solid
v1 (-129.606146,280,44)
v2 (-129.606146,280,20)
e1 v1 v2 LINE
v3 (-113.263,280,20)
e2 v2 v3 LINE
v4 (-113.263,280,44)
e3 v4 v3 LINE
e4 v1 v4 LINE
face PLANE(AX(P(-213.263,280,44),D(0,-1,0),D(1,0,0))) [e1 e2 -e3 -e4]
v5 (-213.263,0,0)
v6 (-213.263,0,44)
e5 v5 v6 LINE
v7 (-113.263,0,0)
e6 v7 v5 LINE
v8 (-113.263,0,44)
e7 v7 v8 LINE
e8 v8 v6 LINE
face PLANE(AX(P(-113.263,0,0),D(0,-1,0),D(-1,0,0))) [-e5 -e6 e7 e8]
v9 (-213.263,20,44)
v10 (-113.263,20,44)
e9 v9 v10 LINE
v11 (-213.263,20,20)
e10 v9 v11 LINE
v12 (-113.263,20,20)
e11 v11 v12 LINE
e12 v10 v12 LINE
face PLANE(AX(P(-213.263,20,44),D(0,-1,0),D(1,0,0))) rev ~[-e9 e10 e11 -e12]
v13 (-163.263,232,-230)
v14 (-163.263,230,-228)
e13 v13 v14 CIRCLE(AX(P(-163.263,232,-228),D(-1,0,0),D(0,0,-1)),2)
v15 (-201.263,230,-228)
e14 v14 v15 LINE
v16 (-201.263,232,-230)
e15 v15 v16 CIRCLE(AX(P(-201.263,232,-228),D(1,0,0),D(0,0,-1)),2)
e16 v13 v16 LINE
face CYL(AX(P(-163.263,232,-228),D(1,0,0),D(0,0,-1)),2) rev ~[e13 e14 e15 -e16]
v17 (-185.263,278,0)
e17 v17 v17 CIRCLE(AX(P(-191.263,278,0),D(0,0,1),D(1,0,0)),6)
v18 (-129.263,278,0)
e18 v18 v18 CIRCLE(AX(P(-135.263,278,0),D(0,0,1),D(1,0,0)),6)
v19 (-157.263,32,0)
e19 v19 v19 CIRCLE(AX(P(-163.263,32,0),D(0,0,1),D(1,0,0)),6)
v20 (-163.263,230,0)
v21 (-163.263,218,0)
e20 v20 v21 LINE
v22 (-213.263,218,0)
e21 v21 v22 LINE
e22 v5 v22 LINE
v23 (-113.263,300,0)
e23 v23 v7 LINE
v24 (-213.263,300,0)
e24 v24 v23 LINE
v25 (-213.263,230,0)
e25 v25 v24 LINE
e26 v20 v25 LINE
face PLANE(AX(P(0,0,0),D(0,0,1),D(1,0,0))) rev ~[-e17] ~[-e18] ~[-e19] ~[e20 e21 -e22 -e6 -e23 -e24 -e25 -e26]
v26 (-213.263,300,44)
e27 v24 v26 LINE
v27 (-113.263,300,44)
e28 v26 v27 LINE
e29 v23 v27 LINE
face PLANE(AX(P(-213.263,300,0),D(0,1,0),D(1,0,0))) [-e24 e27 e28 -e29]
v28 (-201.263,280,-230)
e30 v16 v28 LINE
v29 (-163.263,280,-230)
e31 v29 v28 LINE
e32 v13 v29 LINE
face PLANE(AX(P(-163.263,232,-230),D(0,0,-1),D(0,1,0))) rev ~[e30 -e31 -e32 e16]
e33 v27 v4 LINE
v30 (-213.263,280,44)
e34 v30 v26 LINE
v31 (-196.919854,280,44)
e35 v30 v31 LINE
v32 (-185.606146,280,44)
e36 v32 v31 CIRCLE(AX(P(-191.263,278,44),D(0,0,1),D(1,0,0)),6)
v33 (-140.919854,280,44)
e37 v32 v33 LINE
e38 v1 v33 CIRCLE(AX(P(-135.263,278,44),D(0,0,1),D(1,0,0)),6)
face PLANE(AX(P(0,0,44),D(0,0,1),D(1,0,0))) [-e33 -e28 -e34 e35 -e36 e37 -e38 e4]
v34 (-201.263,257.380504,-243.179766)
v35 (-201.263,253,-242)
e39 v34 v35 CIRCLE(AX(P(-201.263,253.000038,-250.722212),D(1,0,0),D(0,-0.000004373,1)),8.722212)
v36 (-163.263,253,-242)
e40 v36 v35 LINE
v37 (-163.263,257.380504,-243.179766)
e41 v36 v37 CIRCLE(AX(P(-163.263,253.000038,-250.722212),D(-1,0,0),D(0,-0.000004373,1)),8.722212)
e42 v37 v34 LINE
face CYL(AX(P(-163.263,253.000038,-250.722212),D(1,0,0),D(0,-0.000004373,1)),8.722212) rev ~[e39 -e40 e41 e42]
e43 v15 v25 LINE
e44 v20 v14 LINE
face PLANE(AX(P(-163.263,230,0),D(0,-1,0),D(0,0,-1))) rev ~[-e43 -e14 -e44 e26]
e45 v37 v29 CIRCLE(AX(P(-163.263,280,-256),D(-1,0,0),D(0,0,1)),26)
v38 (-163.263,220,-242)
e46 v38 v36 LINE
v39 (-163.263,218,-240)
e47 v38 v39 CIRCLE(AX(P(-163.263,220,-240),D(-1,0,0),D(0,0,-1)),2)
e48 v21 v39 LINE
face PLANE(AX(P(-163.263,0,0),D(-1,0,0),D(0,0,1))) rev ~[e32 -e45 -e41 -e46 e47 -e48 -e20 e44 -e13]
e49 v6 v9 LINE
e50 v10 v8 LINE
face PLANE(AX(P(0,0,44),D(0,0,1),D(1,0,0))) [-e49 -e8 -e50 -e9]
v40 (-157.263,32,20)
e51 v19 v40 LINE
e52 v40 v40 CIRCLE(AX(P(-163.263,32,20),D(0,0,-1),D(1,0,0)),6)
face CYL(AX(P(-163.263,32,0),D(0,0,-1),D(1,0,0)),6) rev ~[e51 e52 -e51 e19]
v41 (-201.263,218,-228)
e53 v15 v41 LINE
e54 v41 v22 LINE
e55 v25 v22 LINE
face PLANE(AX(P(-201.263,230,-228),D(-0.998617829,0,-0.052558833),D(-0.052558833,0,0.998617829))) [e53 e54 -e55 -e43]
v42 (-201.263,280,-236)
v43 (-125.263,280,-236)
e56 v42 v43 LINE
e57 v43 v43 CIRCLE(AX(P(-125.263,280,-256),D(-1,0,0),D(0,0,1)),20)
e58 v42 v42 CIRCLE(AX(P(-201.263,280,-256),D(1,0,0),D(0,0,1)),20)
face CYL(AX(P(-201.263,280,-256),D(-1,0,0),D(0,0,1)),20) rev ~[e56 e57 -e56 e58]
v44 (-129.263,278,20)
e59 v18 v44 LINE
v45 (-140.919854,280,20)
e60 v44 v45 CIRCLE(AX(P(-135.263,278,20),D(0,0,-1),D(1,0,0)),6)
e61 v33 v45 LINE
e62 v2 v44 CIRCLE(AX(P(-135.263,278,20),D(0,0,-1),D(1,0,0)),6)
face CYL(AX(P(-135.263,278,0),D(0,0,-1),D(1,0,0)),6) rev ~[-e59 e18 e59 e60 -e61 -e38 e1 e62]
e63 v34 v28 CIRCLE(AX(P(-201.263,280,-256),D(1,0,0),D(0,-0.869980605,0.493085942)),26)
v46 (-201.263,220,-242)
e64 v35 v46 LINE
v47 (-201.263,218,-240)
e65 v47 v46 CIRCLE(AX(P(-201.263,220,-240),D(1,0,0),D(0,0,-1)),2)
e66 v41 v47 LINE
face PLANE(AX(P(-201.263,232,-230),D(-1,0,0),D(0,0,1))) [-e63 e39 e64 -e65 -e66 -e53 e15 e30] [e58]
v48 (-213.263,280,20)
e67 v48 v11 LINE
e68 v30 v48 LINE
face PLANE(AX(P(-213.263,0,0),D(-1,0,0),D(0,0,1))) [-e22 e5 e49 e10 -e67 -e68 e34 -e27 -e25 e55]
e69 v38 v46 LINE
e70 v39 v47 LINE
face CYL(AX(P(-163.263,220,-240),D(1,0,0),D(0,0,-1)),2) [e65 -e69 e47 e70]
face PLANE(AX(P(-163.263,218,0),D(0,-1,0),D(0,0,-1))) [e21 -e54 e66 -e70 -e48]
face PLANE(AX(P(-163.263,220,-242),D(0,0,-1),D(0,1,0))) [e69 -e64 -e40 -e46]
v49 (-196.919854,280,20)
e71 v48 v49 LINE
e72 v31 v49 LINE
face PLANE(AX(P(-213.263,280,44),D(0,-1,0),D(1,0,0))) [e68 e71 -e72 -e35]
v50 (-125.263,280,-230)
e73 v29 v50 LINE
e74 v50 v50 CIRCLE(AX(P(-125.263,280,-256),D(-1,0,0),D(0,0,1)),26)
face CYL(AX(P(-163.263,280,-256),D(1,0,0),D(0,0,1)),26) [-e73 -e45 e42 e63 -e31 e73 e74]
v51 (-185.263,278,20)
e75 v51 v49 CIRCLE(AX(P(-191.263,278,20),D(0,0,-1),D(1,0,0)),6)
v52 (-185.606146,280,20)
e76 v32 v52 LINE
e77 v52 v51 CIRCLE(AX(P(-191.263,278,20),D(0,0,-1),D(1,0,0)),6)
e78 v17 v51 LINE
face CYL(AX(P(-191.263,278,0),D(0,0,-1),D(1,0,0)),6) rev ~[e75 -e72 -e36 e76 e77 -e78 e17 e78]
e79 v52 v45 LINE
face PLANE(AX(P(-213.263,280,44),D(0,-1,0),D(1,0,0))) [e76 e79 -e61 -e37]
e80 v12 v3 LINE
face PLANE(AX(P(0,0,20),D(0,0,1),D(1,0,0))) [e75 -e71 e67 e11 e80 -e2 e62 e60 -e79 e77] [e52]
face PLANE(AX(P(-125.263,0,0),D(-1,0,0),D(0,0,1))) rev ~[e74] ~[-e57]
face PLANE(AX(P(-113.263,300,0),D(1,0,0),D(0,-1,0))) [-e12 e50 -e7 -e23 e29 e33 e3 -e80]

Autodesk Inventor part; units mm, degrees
ref_plane "YZ Plane" through (0, 0, 0) normal (1, 0, 0) x (0, 1, 0)
ref_plane "XZ Plane" through (0, 0, 0) normal (0, 1, 0) x (-1, 0, 0)
ref_plane "XY Plane" through (0, 0, 0) normal (0, 0, 1) x (1, 0, 0)
sketch "Sketch1" plane through (0, 0, 0) normal (0, 0, 1) x (1, 0, 0)
  line L0 (-113.263, 0) -> (-213.263, 0)
  line L1 (-213.263, 0) -> (-213.263, 300)
  line L2 (-213.263, 300) -> (-113.263, 300)
  line L3 (-113.263, 300) -> (-113.263, 0)
  circle A0 centre (-163.263, 32) radius 6
  circle A1 centre (-191.263, 278) radius 6
  circle A2 centre (-135.263, 278) radius 6
  point P0 (0, 0)
  dimension "d0" = 100
  dimension "d1" = 300
  dimension "d2" = 12
  dimension "d3" = 32
  dimension "d4" = 12
  dimension "d5" = 22
  dimension "d6" = 22
  dimension "d7" = 12
  dimension "d8" = 22
  dimension "d9" = 22
extrude "Extrusion1" add sketch "Sketch1" along normal blind 44
sketch "Sketch2" plane through (0, 0, 44) normal (0, 0, 1) x (1, 0, 0)
  line L0 (-113.263, 300) -> (-213.263, 300) projected
  line L1 (-213.263, 300) -> (-213.263, 280)
  line L2 (-213.263, 300) -> (-213.263, 0) projected
  line L3 (-213.263, 280) -> (-113.263, 280)
  line L4 (-113.263, 0) -> (-113.263, 300) projected
  line L5 (-113.263, 280) -> (-113.263, 300)
  line L6 (-213.263, 300) -> (-113.263, 300)
  line L7 (-213.263, 0) -> (-213.263, 20)
  line L8 (-213.263, 0) -> (-113.263, 0) projected
  line L9 (-213.263, 0) -> (-113.263, 0)
  line L10 (-113.263, 0) -> (-113.263, 20)
  line L11 (-213.263, 20) -> (-113.263, 20)
  line L12 (-113.263, 20) -> (-113.263, 280)
  line L13 (-213.263, 20) -> (-213.263, 280)
  point P0 (0, 0)
  dimension "d12" = 20
  dimension "d13" = 20
extrude "Extrusion2" cut sketch "Sketch2" against normal blind 24 contours L4 L11 L2 L3
ref_plane "Work Plane1" through (-163.263, 0, 0) normal (-1, 0, 0) x (0, 0, 1)
sketch "Sketch6" plane through (-163.263, 0, 0) normal (-1, 0, 0) x (0, 0, 1)
  line L0 (44, 284) -> (44, 280) projected
  circle A0 centre (-256, 280) radius 26
  point P0 (0, 0)
  dimension "d24" = 52
extrude "Extrusion5" add sketch "Sketch6" along normal mid plane 76
sketch "Sketch7" plane through (-201.263, 280, -256) normal (-1, 0, 0) x (0, 0, 1)
  circle A0 centre (0, 0) radius 20
  point P0 (256, -280)
  dimension "d27" = 40
extrude "Extrusion6" cut sketch "Sketch7" against normal blind 76
sketch "Sketch9" plane through (-163.263, 0, 0) normal (-1, 0, 0) x (0, 0, 1)
  line L0 (44, 284) -> (44, 280) projected
  circle A0 centre (-256, 280) radius 26
  line L1 (0, 300) -> (0, 0) projected
  circle A1 centre (-256, 280) radius 26 projected
  line L2 (0, 230) -> (-228, 230)
  line L3 (-230, 232) -> (-230, 280)
  line L4 (0, 230) -> (0, 218)
  line L5 (0, 218) -> (-240, 218)
  line L6 (-242, 220) -> (-242, 253)
  arc A2 (-230, 232) -> (-228, 230) centre (-228, 232) ccw
  arc A3 (-242, 220) -> (-240, 218) centre (-240, 220) ccw
  line L7 (-242, 253) -> (-250.7822, 253) construction
  line L8 (-243.1836, 257.3871) -> (-250.7822, 253) construction
  arc A4 (-242, 253) -> (-243.1836, 257.3871) centre (-250.7225, 253) ccw
  point P0 (-242, 218)
  point P1 (-243.1797, 257.3805)
  dimension "d35" = 52
  dimension "d37" = 12
  dimension "d38" = 242
  dimension "d39" = 35
  dimension "d40" = 2
  dimension "d41" = 2
  dimension "d42" = 30
extrude "Extrusion7" add sketch "Sketch9" along normal blind 50 contours L3 A2 L2 L1 L5 A3 L6 A4 A0
sketch "Sketch10" plane through (-163.263, 230, 0) normal (0, 1, 0) x (1, 0, 0)
  line L0 (-50, 0) -> (-41.2717, 264.4302)
  line L1 (-41.2717, 264.4302) -> (-54.1734, 264.856)
  line L2 (-54.1734, 264.856) -> (-50, 0)
  point P0 (163.263, 0)
extrude "Extrusion8" cut sketch "Sketch10" against normal blind 50
sketch "Sketch12" plane through (-213.263, 232, -230) normal (-1, 0, 0) x (0, 0, 1)
  line L0 (-12, 21) -> (-12, -2) projected
  line L1 (0, 48) -> (2.6747, 48)
  line L2 (-12, 48) -> (0, 48)
  line L3 (2.6747, 48) -> (2.6747, -2)
  line L4 (2, -2) -> (230, -2) projected
  line L5 (-12, -2) -> (2.6747, -2)
  line L6 (-12, -2) -> (-15.3342, -2)
  line L7 (-15.3342, -2) -> (-15.3342, 48)
  line L8 (-15.3342, 48) -> (-11.4757, 48)
  point P0 (230, -232)
extrude "Extrusion9" cut sketch "Sketch12" against normal blind 12
sketch "Sketch13" plane through (-163.263, 230, 0) normal (0, 1, 0) x (1, 0, 0)
  line L0 (-38, 228) -> (-38, 242) projected
  line L1 (-38, 228) -> (-50, 0)
  line L2 (-42.012, 242) -> (-38, 242) projected
  line L3 (-50, 0) -> (-42.012, 242)
  line L4 (-42.012, 242) -> (-38, 242)
  line L5 (-38, 242) -> (-38, 228)
  point P0 (163.263, 0)
extrude "Extrusion10" cut sketch "Sketch13" against normal blind 12
properties part number "6 - Part 6"
